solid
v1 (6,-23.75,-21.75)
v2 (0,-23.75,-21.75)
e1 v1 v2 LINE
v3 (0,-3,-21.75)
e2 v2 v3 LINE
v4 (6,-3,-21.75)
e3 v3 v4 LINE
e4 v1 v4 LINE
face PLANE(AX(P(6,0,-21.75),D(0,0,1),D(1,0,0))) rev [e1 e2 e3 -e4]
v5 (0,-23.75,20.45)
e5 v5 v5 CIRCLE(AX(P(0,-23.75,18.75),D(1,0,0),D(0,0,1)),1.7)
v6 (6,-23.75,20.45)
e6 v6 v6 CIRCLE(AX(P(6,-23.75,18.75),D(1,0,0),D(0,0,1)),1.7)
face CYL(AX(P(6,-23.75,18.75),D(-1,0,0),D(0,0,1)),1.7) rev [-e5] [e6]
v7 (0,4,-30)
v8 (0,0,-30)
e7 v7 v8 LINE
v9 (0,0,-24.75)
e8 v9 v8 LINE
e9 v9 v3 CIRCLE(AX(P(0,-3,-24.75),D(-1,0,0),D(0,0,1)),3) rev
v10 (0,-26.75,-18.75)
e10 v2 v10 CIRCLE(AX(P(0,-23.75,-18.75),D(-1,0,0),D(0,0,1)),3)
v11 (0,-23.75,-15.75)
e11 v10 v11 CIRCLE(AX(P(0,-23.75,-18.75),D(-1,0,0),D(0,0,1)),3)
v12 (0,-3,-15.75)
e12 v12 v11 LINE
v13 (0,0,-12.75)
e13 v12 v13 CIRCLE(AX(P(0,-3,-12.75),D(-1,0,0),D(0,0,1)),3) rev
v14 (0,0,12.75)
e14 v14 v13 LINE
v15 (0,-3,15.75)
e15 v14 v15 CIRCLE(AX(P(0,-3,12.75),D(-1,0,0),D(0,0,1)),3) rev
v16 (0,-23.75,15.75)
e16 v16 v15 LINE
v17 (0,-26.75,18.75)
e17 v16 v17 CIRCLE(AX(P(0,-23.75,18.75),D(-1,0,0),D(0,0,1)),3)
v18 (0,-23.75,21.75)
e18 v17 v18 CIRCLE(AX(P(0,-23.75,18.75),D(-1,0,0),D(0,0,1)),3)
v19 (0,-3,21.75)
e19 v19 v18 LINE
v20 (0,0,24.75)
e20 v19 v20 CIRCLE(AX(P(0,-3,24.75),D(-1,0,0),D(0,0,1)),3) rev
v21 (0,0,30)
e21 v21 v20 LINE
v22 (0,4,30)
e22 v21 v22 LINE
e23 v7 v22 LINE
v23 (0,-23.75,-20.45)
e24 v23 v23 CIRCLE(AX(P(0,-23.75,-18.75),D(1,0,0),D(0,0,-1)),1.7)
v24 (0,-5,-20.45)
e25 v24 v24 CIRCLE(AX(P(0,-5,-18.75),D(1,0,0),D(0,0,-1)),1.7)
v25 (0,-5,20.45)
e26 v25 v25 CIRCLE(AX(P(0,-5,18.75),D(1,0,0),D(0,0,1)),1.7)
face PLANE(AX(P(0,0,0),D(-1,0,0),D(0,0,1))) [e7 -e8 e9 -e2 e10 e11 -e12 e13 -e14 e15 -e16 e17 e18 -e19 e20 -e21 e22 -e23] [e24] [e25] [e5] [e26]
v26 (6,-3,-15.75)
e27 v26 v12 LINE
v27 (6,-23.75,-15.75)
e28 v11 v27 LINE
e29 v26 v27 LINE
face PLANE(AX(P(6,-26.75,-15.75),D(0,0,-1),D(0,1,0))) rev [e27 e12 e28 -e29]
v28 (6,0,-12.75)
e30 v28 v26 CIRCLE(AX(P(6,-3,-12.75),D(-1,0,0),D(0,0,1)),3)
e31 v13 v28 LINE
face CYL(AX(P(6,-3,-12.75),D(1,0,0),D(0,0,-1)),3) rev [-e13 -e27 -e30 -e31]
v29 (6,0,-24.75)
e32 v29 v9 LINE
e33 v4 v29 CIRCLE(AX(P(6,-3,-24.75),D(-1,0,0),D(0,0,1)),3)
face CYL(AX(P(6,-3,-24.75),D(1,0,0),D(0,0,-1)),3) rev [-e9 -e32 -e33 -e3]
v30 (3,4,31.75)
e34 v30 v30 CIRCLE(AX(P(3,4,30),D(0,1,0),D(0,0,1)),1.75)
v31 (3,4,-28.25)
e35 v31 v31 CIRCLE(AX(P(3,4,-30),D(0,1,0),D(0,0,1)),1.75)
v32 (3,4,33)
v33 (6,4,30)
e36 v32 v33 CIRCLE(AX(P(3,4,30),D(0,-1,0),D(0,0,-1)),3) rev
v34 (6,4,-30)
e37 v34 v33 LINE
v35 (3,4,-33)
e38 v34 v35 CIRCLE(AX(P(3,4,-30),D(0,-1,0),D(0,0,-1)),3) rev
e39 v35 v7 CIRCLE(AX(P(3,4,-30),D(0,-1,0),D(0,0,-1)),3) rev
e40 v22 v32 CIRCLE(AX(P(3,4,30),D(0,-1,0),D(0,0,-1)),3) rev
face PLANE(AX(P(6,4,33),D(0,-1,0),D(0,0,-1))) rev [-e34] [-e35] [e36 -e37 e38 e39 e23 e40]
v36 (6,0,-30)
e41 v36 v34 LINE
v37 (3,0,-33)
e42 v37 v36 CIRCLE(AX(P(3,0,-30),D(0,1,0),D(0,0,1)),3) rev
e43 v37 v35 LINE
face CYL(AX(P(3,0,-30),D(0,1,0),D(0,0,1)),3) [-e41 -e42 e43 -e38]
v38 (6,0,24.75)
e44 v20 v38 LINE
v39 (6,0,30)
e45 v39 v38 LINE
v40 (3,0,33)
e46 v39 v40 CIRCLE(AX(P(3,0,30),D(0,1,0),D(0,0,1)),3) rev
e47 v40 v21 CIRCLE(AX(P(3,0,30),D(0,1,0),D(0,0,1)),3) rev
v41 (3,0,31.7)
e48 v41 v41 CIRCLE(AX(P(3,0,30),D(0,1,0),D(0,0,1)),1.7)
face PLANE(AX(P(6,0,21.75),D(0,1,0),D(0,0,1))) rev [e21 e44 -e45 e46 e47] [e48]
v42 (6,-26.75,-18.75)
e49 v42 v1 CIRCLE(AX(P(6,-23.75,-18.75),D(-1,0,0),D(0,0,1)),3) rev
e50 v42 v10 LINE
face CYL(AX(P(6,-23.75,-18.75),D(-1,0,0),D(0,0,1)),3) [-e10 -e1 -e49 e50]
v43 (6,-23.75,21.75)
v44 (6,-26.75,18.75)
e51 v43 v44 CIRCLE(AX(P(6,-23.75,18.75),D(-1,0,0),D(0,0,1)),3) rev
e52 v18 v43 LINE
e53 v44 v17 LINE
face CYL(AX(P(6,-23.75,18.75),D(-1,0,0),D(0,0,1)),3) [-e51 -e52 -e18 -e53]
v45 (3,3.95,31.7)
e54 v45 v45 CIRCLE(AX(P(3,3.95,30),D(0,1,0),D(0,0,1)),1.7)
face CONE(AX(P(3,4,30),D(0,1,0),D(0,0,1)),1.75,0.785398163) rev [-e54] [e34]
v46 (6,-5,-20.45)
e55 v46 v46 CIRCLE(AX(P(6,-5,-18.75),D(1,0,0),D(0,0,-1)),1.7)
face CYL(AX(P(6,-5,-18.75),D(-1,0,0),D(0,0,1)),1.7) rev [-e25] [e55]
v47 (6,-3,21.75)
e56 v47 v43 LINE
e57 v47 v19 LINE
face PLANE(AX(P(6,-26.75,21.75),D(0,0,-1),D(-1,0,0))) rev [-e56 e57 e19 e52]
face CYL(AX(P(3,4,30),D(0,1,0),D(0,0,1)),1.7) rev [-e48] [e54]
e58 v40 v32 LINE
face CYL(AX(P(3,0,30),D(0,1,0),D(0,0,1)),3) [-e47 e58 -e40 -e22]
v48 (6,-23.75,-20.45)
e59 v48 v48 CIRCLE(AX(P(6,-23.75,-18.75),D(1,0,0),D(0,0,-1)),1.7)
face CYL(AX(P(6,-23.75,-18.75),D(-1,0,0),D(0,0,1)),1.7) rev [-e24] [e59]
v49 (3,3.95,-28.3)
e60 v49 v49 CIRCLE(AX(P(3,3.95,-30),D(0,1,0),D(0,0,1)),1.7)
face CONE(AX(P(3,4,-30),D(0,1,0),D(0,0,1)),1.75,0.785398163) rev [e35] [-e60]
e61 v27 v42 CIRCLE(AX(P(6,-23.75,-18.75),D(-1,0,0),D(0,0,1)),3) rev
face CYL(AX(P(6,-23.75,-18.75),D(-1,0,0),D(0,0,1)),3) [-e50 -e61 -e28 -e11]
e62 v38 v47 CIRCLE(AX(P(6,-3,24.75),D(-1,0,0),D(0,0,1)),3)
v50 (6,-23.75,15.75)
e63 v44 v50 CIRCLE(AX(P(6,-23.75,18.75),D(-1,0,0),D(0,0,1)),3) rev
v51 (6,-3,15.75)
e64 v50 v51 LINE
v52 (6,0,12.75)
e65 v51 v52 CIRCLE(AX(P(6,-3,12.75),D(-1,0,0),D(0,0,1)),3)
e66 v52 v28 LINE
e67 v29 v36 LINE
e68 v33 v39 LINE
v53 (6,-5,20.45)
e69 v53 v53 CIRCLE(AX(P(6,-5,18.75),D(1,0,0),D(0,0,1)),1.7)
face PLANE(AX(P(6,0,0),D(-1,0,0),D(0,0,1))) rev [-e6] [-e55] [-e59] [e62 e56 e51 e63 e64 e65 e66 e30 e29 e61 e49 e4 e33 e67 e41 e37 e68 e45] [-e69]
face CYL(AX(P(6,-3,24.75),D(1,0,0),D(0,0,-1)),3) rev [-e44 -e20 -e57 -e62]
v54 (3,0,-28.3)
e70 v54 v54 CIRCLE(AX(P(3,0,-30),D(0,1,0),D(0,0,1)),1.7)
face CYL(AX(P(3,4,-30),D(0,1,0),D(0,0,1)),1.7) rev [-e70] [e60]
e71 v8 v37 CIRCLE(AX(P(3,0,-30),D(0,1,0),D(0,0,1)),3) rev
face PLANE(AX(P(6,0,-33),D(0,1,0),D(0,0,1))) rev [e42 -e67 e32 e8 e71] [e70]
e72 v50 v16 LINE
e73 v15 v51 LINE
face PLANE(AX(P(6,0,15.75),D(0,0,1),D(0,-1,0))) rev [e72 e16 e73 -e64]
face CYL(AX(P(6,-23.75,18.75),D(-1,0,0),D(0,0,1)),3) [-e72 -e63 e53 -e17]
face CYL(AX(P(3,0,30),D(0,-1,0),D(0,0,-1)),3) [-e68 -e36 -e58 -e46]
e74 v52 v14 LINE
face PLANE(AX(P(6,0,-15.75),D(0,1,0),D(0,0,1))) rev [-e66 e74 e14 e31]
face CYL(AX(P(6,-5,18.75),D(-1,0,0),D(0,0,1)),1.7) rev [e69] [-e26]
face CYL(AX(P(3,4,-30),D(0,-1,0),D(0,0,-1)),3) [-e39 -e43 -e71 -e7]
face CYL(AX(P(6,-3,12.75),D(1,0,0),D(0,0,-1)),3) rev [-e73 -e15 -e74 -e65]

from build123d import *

# Parameters (mm, degrees)
SKETCH1_R                                       = 1.7
BOSS_EXTRUDE1_DEPTH                             = 6
CSK_FOR_M3_FLAT_HEAD_MACHINE_SCREW1_D           = 3.4
CSK_FOR_M3_FLAT_HEAD_MACHINE_SCREW1_DEPTH       = 6
CSK_FOR_M3_FLAT_HEAD_MACHINE_SCREW1_CSINK_D     = 3.5
CSK_FOR_M3_FLAT_HEAD_MACHINE_SCREW1_CSINK_ANGLE = 90
CSK_FOR_M3_FLAT_HEAD_MACHINE_SCREW1_TIP         = 1.021463052
FILLET1_R                                       = 3
FILLET2_R                                       = 3
FILLET3_R                                       = 3


with BuildPart() as part:
    # Sketch1 → Boss-Extrude1 (new body)
    with BuildSketch(Plane(origin=(0, 0, 0), x_dir=(0, 0, -1), z_dir=(1, 0, 0))):
        Polygon((-21.75, -26.75), (-21.75, 0), (-33, 0), (-33, 4), (33, 4), (33, 0), (21.75, 0), (21.75, -26.75), (15.75, -26.75), (15.75, 0), (-15.75, 0), (-15.75, -26.75), align=None)
        with Locations((18.75, -5)):
            Circle(SKETCH1_R, mode=Mode.SUBTRACT)
        with Locations((18.75, -23.75)):
            Circle(SKETCH1_R, mode=Mode.SUBTRACT)
        with Locations(Location((-18.75, -23.75, 0), (0, 0, 180))):
            Circle(SKETCH1_R, mode=Mode.SUBTRACT)
        with Locations(Location((-18.75, -5, 0), (0, 0, 180))):
            Circle(SKETCH1_R, mode=Mode.SUBTRACT)
    extrude(amount=BOSS_EXTRUDE1_DEPTH)

    # CSK for M3 Flat Head Machine Screw1
    with Locations(Plane(origin=(0, 4, 0), x_dir=(1, 0, 0), z_dir=(0, 1, 0))):
        with Locations((3, 30), (3, -30)):
            CounterSinkHole(CSK_FOR_M3_FLAT_HEAD_MACHINE_SCREW1_D / 2, CSK_FOR_M3_FLAT_HEAD_MACHINE_SCREW1_CSINK_D / 2, depth=CSK_FOR_M3_FLAT_HEAD_MACHINE_SCREW1_DEPTH, counter_sink_angle=CSK_FOR_M3_FLAT_HEAD_MACHINE_SCREW1_CSINK_ANGLE)
            with Locations((0, 0, -(CSK_FOR_M3_FLAT_HEAD_MACHINE_SCREW1_DEPTH + CSK_FOR_M3_FLAT_HEAD_MACHINE_SCREW1_TIP / 2))):  # 118° drill point
                Cone(0, CSK_FOR_M3_FLAT_HEAD_MACHINE_SCREW1_D / 2, CSK_FOR_M3_FLAT_HEAD_MACHINE_SCREW1_TIP, mode=Mode.SUBTRACT)

    # Fillet1
    fillet1_edges = [part.edges().sort_by_distance(p)[0] for p in [
        (3, -26.75, -21.75),
        (3, -26.75, -15.75),
        (3, -26.75, 15.75),
        (3, -26.75, 21.75),
    ]]
    fillet(fillet1_edges, radius=FILLET1_R - 0.0001)  # a hair under: the kernel refuses the full size

    # Fillet2
    fillet2_edges = [part.edges().sort_by_distance(p)[0] for p in [
        (3, 0, 21.75),
        (3, 0, -21.75),
        (3, 0, -15.75),
        (3, 0, 15.75),
    ]]
    fillet(fillet2_edges, radius=FILLET2_R)

    # Fillet3
    fillet3_edges = [part.edges().sort_by_distance(p)[0] for p in [
        (6, 2, -33),
        (0, 2, -33),
        (0, 2, 33),
        (6, 2, 33),
    ]]
    fillet(fillet3_edges, radius=FILLET3_R - 0.0001)  # a hair under: the kernel refuses the full size


solid = part.part
